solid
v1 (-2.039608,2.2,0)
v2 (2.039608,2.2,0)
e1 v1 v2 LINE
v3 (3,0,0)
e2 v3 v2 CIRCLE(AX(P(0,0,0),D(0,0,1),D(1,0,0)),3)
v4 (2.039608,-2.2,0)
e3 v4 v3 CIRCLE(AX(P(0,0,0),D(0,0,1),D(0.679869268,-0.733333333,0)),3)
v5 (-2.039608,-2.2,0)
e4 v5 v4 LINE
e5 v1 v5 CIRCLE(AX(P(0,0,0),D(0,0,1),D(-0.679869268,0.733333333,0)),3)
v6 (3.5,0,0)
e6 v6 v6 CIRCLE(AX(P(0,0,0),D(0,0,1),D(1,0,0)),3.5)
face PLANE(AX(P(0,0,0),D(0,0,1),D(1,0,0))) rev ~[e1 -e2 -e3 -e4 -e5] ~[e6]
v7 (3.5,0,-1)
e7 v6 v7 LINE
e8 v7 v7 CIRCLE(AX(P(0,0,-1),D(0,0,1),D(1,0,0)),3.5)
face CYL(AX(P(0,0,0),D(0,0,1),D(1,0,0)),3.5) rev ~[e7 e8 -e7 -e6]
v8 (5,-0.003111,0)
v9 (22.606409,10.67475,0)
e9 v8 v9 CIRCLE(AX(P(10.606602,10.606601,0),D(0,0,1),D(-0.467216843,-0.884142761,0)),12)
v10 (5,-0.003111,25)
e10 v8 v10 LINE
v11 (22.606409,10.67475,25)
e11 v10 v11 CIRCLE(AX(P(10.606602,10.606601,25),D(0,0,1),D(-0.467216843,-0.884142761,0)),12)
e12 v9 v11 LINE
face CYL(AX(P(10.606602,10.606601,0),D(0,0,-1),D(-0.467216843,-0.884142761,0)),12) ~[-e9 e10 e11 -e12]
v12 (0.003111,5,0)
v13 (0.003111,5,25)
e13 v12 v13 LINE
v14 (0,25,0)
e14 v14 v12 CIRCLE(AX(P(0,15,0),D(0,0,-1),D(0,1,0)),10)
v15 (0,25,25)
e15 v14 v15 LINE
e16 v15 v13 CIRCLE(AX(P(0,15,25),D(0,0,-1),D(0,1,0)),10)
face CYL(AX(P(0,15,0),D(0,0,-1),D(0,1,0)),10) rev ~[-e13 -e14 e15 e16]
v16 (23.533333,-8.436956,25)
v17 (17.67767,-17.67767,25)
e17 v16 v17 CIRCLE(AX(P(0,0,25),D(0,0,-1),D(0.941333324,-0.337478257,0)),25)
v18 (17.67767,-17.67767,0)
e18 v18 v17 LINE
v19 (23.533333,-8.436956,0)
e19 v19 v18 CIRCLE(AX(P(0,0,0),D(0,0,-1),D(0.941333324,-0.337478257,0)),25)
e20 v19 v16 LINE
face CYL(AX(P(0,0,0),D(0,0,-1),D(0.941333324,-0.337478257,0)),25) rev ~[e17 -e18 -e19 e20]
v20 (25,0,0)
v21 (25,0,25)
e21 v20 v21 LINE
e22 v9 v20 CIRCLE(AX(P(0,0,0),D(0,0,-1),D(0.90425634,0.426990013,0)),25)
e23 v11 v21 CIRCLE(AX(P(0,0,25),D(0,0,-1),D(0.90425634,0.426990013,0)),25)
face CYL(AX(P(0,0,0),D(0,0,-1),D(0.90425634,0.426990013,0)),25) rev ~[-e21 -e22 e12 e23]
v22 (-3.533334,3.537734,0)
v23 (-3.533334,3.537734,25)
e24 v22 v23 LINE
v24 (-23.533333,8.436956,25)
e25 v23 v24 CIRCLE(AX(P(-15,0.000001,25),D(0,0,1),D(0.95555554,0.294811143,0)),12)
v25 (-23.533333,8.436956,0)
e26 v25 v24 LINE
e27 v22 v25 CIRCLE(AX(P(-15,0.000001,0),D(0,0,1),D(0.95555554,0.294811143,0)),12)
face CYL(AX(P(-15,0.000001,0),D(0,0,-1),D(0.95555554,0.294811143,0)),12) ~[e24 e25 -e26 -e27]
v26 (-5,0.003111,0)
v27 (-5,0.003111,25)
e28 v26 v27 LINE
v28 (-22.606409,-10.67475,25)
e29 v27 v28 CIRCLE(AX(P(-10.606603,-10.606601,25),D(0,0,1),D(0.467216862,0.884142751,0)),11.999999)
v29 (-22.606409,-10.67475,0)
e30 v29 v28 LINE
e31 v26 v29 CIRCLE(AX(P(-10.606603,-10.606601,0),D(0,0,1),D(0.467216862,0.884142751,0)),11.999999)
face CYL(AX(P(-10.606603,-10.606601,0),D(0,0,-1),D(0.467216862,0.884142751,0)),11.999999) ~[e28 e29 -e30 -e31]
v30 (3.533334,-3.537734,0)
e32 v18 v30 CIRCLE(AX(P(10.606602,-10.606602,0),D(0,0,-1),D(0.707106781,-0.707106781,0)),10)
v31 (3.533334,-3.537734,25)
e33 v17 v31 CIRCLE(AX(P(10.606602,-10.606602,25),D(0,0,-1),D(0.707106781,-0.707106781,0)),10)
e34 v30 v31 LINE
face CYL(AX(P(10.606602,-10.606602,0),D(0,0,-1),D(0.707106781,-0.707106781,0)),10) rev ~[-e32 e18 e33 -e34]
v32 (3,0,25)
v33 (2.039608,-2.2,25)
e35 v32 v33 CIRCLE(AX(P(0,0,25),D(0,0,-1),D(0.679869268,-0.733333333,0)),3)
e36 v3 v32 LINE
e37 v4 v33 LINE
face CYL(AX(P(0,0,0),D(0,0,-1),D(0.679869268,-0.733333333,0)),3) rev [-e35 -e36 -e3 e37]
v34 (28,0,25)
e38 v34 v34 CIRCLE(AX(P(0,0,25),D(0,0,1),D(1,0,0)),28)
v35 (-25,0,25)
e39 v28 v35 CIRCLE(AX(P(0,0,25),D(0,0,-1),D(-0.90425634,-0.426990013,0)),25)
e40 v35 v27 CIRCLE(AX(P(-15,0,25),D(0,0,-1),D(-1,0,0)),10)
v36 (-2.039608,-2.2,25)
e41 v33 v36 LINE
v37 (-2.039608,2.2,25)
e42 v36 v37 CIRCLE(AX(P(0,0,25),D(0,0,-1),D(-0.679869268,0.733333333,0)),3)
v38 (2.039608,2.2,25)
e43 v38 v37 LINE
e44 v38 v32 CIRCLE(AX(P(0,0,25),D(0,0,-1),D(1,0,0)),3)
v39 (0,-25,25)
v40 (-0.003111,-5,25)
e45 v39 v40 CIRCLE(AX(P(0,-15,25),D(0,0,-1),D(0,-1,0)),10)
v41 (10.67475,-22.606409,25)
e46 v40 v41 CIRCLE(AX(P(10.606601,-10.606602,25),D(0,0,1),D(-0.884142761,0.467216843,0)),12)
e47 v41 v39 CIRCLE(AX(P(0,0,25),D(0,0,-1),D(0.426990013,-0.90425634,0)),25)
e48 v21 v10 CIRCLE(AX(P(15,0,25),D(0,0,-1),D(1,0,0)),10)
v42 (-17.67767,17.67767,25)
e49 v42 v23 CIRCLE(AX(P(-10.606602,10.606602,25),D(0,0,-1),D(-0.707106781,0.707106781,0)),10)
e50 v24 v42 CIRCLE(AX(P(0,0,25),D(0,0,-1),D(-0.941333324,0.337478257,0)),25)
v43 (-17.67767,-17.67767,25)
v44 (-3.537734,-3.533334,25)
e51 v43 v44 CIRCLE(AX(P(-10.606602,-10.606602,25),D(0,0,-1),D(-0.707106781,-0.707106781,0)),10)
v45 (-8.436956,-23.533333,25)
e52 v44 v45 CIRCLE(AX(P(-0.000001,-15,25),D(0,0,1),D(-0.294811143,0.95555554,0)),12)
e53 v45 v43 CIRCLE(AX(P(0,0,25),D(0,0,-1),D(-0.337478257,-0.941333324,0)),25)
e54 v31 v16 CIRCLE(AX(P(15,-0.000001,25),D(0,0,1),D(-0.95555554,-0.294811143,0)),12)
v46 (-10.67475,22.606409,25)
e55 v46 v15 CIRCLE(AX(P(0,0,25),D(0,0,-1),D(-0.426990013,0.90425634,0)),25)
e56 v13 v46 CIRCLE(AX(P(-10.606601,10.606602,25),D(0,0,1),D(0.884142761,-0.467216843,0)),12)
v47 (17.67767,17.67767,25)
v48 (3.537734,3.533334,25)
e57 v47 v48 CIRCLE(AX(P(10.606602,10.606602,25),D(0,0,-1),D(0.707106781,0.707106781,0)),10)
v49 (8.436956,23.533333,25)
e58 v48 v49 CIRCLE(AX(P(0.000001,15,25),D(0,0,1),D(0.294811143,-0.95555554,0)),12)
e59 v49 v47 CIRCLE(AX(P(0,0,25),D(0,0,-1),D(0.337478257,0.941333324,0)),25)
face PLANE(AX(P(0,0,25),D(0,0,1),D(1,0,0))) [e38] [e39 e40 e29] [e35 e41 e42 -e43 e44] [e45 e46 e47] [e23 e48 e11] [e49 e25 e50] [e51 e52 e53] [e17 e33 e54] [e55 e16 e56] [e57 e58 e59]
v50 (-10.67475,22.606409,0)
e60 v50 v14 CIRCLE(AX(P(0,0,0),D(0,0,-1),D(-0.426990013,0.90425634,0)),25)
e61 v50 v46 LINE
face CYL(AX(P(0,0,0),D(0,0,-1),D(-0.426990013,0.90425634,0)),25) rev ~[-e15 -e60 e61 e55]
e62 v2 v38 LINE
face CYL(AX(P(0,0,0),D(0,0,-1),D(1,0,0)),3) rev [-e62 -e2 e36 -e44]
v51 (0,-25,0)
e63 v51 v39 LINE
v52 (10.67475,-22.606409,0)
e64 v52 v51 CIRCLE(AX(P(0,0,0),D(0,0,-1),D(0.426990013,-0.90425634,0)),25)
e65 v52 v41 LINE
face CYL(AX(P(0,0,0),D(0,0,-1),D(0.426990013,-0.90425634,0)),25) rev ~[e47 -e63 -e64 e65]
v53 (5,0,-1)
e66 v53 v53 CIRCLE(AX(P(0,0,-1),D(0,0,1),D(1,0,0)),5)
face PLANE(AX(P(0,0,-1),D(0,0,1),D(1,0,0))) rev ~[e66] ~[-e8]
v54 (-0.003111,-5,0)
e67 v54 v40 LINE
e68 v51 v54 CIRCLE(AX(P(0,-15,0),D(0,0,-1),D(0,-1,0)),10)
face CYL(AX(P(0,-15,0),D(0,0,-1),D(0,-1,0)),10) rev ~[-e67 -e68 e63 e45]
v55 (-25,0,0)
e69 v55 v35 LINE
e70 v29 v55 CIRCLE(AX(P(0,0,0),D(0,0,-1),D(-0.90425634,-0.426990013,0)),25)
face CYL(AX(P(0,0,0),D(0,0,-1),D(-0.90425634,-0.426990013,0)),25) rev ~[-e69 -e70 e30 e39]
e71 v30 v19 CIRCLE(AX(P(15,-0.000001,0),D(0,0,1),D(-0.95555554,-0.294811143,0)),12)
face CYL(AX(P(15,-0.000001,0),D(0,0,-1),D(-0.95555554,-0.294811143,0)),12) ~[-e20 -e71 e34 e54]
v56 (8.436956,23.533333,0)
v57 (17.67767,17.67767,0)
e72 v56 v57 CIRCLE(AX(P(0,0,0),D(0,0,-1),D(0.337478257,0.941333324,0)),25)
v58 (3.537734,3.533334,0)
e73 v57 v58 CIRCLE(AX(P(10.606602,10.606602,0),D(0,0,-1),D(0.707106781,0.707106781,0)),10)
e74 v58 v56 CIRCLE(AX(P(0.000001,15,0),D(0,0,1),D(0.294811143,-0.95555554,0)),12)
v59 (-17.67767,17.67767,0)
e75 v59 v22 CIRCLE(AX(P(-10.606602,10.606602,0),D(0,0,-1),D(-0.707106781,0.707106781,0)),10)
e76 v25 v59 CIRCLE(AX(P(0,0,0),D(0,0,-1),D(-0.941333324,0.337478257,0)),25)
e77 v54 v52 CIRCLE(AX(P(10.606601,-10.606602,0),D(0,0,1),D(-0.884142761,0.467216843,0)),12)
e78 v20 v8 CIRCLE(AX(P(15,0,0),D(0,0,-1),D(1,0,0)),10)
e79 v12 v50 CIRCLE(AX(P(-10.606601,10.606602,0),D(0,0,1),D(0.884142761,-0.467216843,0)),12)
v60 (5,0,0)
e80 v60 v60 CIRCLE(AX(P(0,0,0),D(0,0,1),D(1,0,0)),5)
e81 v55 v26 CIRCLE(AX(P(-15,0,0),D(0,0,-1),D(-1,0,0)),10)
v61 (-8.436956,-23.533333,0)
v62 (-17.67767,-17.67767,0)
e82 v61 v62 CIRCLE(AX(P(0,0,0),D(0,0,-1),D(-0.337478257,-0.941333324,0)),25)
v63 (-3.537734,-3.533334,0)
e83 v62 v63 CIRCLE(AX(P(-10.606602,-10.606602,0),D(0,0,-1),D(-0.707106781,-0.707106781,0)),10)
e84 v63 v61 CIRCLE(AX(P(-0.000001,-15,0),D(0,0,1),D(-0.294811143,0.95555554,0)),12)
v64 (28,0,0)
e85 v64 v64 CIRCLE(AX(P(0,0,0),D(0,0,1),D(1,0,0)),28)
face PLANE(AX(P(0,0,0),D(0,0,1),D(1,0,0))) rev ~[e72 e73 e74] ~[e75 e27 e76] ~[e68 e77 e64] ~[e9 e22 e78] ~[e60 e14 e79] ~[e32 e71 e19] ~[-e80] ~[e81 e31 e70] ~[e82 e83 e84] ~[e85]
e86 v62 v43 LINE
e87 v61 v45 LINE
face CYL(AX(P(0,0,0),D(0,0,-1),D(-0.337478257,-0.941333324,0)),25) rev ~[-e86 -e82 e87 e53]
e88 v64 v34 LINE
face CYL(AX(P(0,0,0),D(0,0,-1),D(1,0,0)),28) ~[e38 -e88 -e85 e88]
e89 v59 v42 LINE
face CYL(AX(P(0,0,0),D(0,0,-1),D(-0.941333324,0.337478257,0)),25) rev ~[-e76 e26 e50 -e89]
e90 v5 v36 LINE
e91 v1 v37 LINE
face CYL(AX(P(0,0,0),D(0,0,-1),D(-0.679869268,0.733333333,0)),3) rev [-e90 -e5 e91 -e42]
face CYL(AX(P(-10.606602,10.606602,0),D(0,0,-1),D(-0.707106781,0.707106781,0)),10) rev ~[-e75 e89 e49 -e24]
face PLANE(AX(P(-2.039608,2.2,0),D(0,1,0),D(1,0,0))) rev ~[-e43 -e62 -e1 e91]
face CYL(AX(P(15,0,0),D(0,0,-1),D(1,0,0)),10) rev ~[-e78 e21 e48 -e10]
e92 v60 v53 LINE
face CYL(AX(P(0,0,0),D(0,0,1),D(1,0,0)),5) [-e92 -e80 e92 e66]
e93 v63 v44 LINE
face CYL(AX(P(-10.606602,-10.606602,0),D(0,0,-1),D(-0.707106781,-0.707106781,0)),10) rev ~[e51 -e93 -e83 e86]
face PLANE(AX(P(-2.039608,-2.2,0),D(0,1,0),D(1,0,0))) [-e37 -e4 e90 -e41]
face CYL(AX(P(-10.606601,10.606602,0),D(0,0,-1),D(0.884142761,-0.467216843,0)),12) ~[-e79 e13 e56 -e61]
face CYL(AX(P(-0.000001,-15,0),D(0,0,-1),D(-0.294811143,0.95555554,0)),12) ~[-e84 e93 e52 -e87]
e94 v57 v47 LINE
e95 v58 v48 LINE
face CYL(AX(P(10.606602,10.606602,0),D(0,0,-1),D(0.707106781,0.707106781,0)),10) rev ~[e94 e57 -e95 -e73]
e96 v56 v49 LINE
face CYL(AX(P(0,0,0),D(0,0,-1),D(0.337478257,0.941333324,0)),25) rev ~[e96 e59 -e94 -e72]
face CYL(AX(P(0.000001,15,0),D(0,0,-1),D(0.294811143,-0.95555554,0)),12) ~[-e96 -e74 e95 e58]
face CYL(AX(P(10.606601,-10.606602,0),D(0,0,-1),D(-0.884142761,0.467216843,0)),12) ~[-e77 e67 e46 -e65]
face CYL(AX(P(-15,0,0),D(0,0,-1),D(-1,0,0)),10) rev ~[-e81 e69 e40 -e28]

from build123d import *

# Parameters (mm, degrees)
F0_R     = 28
F1_DEPTH = 25
F2_W     = 4.0792156109
F2_H     = 4.4
F3_DEPTH = 30
F4_R     = 5
F4_R_2   = 3.5
F5_DEPTH = 1


# Not quite as in the source:
# - ends of sketch curves that miss each other by under 0.0002 mm in the source are joined


with BuildPart() as f1:
    # F0 (on Top) → F1 (new body)
    with BuildSketch(Plane.XY):
        Circle(F0_R)
        with BuildLine():
            ThreePointArc((22.6064085074, 10.6747503202), (24.3942638, 5.4699080119), (25, 0))
            ThreePointArc((25, 0), (24.6306042082, -4.2817445441), (23.5333330927, -8.4369564149))
            ThreePointArc((23.5333330927, -8.4369564149), (21.1171584026, -13.3815403074), (17.6776695297, -17.6776695297))
            ThreePointArc((17.6776695297, -17.6776695297), (14.3888166579, -20.4441178628), (10.6747503202, -22.6064085074))
            ThreePointArc((10.6747503202, -22.6064085074), (5.4699080119, -24.3942638), (0, -25))
            ThreePointArc((0, -25), (-4.2817445441, -24.6306042082), (-8.4369564149, -23.5333330927))
            ThreePointArc((-8.4369564149, -23.5333330927), (-13.3815403074, -21.1171584026), (-17.6776695297, -17.6776695297))
            ThreePointArc((-17.6776695297, -17.6776695297), (-20.4441178628, -14.3888166579), (-22.6064085074, -10.6747503202))
            ThreePointArc((-22.6064085074, -10.6747503202), (-24.3942638, -5.4699080119), (-25, 0))
            ThreePointArc((-25, 0), (-24.6306042082, 4.2817445441), (-23.5333330927, 8.4369564149))
            ThreePointArc((-23.5333330927, 8.4369564149), (-21.1171584026, 13.3815403074), (-17.6776695297, 17.6776695297))
            ThreePointArc((-17.6776695297, 17.6776695297), (-14.3888166579, 20.4441178628), (-10.6747503202, 22.6064085074))
            ThreePointArc((-10.6747503202, 22.6064085074), (-5.4699080119, 24.3942638), (0, 25))
            ThreePointArc((0, 25), (4.2817445441, 24.6306042082), (8.4369564149, 23.5333330927))
            ThreePointArc((8.4369564149, 23.5333330927), (13.3815403074, 21.1171584026), (17.6776695297, 17.6776695297))
            ThreePointArc((17.6776695297, 17.6776695297), (20.4441178628, 14.3888166579), (22.6064085074, 10.6747503202))
        make_face(mode=Mode.SUBTRACT)
        with BuildLine():
            ThreePointArc((23.5333330927, -8.4369564149), (24.6306042082, -4.2817445441), (25, 0))
            ThreePointArc((25, 0), (15.0015557257, -9.999999879), (5.0000004841, -0.0031114513))
            ThreePointArc((5.0000004841, -0.0031114513), (16.8293380679, 0.3461163718), (22.6064085074, 10.6747503202))
            ThreePointArc((22.6064085074, 10.6747503202), (20.4441178628, 14.3888166579), (17.6776695297, 17.6776695297))
            ThreePointArc((17.6776695297, 17.6776695297), (17.6787695083, 3.5366340557), (3.5377343766, 3.5333341199))
            ThreePointArc((3.5377343766, 3.5333341199), (11.6553978371, 12.1448803043), (8.4369564149, 23.5333330927))
            ThreePointArc((8.4369564149, 23.5333330927), (4.2817445441, 24.6306042082), (0, 25))
            ThreePointArc((0, 25), (9.999999879, 15.0015557257), (0.0031114513, 5.0000004841))
            ThreePointArc((0.0031114513, 5.0000004841), (-0.3461163718, 16.8293380679), (-10.6747503202, 22.6064085074))
            ThreePointArc((-10.6747503202, 22.6064085074), (-14.3888166579, 20.4441178628), (-17.6776695297, 17.6776695297))
            ThreePointArc((-17.6776695297, 17.6776695297), (-3.5366340557, 17.6787695083), (-3.5333341199, 3.5377343766))
            ThreePointArc((-3.5333341199, 3.5377343766), (-12.1448803043, 11.6553978371), (-23.5333330927, 8.4369564149))
            ThreePointArc((-23.5333330927, 8.4369564149), (-24.6306042082, 4.2817445441), (-25, 0))
            ThreePointArc((-25, 0), (-15.0015556407, 9.999999879), (-5.000000484, 0.0031112813))
            ThreePointArc((-5.000000484, 0.0031112813), (-16.8293380679, -0.3461163718), (-22.6064085074, -10.6747503202))
            ThreePointArc((-22.6064085074, -10.6747503202), (-20.4441178628, -14.3888166579), (-17.6776695297, -17.6776695297))
            ThreePointArc((-17.6776695297, -17.6776695297), (-17.6787695083, -3.5366340557), (-3.5377343766, -3.5333341199))
            ThreePointArc((-3.5377343766, -3.5333341199), (-11.6553978371, -12.1448803043), (-8.4369564149, -23.5333330927))
            ThreePointArc((-8.4369564149, -23.5333330927), (-4.2817445441, -24.6306042082), (0, -25))
            ThreePointArc((0, -25), (-9.999999879, -15.0015557257), (-0.0031114513, -5.0000004841))
            ThreePointArc((-0.0031114513, -5.0000004841), (0.3461163718, -16.8293380679), (10.6747503202, -22.6064085074))
            ThreePointArc((10.6747503202, -22.6064085074), (14.3888166579, -20.4441178628), (17.6776695297, -17.6776695297))
            ThreePointArc((17.6776695297, -17.6776695297), (3.5366340557, -17.6787695083), (3.5333341199, -3.5377343766))
            ThreePointArc((3.5333341199, -3.5377343766), (12.1448803043, -11.6553978371), (23.5333330927, -8.4369564149))
        make_face()
    extrude(amount=F1_DEPTH)

    # F2 (on Top) → F3 (cut)
    with BuildSketch(Plane.XY):
        with BuildLine():
            Line((-2.0396078054, -2.2), (-2.0396078054, 2.2))
            ThreePointArc((-2.0396078054, 2.2), (-3, 0), (-2.0396078054, -2.2))
        make_face()
        Rectangle(F2_W, F2_H)
        with BuildLine():
            ThreePointArc((2.0396078054, -2.2), (2.7494384351, -1.2002450966), (3, 0))
            ThreePointArc((3, 0), (2.7494384351, 1.2002450966), (2.0396078054, 2.2))
            Line((2.0396078054, 2.2), (2.0396078054, -2.2))
        make_face()
    extrude(amount=F3_DEPTH, mode=Mode.SUBTRACT)

    # F4 (on Top) → F5 (join)
    with BuildSketch(Plane.XY):
        Circle(F4_R)
        Circle(F4_R_2, mode=Mode.SUBTRACT)
    extrude(amount=-F5_DEPTH)


solid = f1.part
